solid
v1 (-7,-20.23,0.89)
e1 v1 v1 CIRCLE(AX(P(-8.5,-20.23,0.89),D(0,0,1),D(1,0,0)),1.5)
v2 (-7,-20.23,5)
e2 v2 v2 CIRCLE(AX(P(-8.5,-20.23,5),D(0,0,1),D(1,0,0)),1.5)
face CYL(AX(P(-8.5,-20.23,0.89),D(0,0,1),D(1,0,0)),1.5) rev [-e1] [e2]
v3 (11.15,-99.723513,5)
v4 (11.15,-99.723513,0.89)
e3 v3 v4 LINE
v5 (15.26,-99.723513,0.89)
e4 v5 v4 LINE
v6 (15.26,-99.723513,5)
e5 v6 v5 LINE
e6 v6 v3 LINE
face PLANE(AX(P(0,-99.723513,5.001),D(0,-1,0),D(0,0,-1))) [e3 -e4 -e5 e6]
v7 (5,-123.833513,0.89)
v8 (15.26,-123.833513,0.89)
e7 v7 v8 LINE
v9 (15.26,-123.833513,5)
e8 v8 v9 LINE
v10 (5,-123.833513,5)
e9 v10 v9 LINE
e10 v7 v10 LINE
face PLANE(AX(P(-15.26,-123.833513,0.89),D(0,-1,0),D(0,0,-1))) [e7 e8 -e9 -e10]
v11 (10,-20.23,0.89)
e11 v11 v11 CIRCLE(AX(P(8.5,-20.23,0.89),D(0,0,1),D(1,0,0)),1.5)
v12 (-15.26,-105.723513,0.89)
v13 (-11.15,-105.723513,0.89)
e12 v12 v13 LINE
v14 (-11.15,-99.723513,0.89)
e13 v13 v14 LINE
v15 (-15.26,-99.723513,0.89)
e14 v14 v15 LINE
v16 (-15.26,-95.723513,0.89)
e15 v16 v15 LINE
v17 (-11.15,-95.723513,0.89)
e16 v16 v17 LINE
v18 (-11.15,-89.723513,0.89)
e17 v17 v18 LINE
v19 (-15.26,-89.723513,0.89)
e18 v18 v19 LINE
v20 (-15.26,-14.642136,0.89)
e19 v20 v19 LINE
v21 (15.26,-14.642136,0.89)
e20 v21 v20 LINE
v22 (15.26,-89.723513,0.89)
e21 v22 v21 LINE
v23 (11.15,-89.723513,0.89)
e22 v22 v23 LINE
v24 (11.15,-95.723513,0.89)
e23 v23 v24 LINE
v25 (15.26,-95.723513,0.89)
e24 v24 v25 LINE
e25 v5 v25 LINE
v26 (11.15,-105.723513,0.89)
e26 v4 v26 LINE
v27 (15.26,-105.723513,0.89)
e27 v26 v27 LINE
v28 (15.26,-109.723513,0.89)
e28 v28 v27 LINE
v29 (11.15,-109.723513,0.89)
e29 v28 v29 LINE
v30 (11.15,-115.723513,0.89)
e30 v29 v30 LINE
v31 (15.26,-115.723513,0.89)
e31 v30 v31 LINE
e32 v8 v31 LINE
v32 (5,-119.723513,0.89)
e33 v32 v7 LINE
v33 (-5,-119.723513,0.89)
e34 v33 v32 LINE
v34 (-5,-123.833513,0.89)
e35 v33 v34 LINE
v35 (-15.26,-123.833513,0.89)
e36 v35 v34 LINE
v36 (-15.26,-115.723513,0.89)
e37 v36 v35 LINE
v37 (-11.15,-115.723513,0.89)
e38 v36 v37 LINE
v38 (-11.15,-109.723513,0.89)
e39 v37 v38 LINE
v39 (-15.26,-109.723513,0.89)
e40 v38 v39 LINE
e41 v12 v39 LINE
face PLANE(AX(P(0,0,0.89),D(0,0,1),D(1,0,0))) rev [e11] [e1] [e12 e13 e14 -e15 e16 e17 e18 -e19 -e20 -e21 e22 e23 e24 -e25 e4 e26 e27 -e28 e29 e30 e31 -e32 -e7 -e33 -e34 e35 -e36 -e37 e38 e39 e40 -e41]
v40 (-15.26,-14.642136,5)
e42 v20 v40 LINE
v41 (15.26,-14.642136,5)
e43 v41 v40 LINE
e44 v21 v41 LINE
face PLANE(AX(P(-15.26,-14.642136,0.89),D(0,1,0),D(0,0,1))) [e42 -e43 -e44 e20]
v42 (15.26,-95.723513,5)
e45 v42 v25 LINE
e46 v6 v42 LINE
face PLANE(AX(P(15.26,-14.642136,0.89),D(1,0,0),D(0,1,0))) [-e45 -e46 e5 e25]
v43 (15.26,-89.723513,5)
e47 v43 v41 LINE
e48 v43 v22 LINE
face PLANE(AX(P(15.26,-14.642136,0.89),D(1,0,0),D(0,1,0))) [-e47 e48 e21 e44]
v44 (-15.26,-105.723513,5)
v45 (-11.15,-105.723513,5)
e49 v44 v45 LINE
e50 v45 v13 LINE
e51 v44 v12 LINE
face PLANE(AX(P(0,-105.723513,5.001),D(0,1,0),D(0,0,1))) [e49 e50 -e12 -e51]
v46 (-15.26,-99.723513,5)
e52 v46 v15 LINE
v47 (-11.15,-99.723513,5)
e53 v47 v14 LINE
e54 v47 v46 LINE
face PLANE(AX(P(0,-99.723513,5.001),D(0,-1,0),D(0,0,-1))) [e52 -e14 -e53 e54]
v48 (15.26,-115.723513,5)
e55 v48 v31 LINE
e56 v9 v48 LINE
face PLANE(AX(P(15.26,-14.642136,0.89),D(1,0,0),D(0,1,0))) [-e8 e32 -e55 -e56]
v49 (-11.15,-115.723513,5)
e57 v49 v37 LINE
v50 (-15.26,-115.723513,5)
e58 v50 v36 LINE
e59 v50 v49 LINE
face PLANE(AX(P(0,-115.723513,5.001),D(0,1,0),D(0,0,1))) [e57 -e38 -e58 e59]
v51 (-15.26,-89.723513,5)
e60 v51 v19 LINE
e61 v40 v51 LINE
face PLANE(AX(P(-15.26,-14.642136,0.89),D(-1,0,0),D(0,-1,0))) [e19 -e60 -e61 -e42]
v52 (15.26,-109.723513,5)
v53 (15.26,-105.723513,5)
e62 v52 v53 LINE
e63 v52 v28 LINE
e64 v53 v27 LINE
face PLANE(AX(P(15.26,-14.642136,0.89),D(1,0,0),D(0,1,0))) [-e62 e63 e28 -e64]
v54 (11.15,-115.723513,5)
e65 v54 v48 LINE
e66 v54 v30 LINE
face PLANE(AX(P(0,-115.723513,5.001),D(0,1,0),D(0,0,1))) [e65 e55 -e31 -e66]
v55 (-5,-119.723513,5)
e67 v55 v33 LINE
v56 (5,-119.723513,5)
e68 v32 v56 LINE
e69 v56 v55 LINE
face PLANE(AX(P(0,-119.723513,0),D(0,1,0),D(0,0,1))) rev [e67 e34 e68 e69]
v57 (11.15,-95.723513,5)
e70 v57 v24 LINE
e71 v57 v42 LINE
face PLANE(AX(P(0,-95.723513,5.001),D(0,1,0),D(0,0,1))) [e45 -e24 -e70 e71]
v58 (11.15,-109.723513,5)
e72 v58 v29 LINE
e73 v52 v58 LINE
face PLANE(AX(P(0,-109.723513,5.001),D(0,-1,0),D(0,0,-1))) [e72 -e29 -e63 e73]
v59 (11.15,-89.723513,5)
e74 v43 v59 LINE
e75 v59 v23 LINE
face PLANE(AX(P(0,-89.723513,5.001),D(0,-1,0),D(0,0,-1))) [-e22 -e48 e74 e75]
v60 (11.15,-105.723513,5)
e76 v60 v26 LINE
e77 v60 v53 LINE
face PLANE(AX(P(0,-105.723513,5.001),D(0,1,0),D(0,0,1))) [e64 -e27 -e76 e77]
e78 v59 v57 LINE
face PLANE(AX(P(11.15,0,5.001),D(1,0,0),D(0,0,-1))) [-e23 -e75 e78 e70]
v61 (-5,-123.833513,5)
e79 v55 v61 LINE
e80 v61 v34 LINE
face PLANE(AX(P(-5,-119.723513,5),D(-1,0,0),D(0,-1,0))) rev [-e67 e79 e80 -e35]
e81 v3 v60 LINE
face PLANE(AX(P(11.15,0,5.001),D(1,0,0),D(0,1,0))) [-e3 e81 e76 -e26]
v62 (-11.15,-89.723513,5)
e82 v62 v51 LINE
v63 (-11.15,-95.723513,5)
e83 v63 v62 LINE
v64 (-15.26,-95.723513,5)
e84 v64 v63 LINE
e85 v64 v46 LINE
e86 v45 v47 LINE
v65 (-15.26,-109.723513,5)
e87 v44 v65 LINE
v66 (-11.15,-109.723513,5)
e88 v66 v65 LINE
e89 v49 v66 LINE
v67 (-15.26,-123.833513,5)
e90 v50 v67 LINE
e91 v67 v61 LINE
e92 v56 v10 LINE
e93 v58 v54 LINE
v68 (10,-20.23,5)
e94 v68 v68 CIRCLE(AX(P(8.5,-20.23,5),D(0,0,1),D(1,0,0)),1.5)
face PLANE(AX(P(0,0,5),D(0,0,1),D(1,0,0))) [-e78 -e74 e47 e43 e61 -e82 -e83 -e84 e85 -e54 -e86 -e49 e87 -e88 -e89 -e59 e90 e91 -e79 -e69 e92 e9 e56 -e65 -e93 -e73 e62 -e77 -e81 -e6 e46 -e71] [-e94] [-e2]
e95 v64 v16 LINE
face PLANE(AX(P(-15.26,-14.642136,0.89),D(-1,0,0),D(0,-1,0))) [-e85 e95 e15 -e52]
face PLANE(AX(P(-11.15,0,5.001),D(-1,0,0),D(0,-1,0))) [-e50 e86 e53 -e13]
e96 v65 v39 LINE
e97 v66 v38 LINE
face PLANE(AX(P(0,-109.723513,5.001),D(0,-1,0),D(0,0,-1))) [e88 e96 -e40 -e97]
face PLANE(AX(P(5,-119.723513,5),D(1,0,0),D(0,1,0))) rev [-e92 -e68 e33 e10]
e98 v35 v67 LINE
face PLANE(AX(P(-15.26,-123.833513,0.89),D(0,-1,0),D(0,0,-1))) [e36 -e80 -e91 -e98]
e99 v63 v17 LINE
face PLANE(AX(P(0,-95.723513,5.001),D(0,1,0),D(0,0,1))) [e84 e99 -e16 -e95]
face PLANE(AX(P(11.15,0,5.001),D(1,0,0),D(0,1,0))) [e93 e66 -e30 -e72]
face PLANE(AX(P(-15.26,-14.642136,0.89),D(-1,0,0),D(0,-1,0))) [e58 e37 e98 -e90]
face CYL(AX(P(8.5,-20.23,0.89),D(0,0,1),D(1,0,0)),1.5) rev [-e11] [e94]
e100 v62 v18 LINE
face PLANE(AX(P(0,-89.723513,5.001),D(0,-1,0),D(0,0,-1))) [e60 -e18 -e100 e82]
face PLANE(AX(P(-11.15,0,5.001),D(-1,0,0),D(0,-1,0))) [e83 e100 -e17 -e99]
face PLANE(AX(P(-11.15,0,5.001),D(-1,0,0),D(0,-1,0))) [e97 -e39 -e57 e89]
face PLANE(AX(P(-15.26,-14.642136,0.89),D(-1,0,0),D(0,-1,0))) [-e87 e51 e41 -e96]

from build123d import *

# Parameters (mm, degrees)
MOTOR_SUPPORT_FRONT_PADDLE_MASTER_2_W = 30.52
MOTOR_SUPPORT_FRONT_PADDLE_MASTER_2_H = 109.191376887
MOTOR_SUPPORT_FRONT_PADDLE_MASTER_2_R = 1.5
BOSS_EXTRUDE1_DEPTH                   = 4.11
CUT_EXTRUDE1_START                    = -37.61
SKETCH14_PADDLE_MASTER_2_W            = 4.11
SKETCH14_PADDLE_MASTER_2_H            = 6
CUT_EXTRUDE1_DEPTH                    = 4.11
PADDLE_MASTER_START                   = -5
PADDLE_MASTER_OUTLINE_W               = 4.11
PADDLE_MASTER_OUTLINE_H               = 4.11
PADDLE_MASTER_DEPTH                   = 10


# Read off the part's stored shape, not the designer's step: paddle_master
with BuildPart() as part:
    # motor_support_front-paddle_master<2> → Boss-Extrude1 (new body)
    with BuildSketch(Plane(origin=(0, -2.5, 5), x_dir=(1, 0, 0), z_dir=(0, 0, 1))):
        with Locations((0, -66.737824068)):
            Rectangle(MOTOR_SUPPORT_FRONT_PADDLE_MASTER_2_W, MOTOR_SUPPORT_FRONT_PADDLE_MASTER_2_H)
        with Locations((8.5, -17.73)):
            Circle(MOTOR_SUPPORT_FRONT_PADDLE_MASTER_2_R, mode=Mode.SUBTRACT)
        with Locations((-8.5, -17.73)):
            Circle(MOTOR_SUPPORT_FRONT_PADDLE_MASTER_2_R, mode=Mode.SUBTRACT)
    extrude(amount=-BOSS_EXTRUDE1_DEPTH)

    # Sketch14-paddle_master<2> → Cut-Extrude1 (cut)
    with BuildSketch(Plane(origin=(11.15, 12.5, 38.5), x_dir=(1, 0, 0), z_dir=(0, 0, 1)).offset(CUT_EXTRUDE1_START)):
        with Locations((-24.355, -125.223512511)):
            Rectangle(SKETCH14_PADDLE_MASTER_2_W, SKETCH14_PADDLE_MASTER_2_H)
        with Locations((-24.355, -115.223512511)):
            Rectangle(SKETCH14_PADDLE_MASTER_2_W, SKETCH14_PADDLE_MASTER_2_H)
        with Locations((-24.355, -105.223512511)):
            Rectangle(SKETCH14_PADDLE_MASTER_2_W, SKETCH14_PADDLE_MASTER_2_H)
        with Locations((2.055, -125.223512511)):
            Rectangle(SKETCH14_PADDLE_MASTER_2_W, SKETCH14_PADDLE_MASTER_2_H)
        with Locations((2.055, -115.223512511)):
            Rectangle(SKETCH14_PADDLE_MASTER_2_W, SKETCH14_PADDLE_MASTER_2_H)
        with Locations((2.055, -105.223512511)):
            Rectangle(SKETCH14_PADDLE_MASTER_2_W, SKETCH14_PADDLE_MASTER_2_H)
    extrude(amount=CUT_EXTRUDE1_DEPTH, mode=Mode.SUBTRACT)

    # paddle_master outline → paddle_master (cut)
    with BuildSketch(Plane.YZ.offset(PADDLE_MASTER_START)):
        with Locations((-121.778512511, 2.945)):
            Rectangle(PADDLE_MASTER_OUTLINE_W, PADDLE_MASTER_OUTLINE_H)
    extrude(amount=PADDLE_MASTER_DEPTH, mode=Mode.SUBTRACT)


solid = part.part
